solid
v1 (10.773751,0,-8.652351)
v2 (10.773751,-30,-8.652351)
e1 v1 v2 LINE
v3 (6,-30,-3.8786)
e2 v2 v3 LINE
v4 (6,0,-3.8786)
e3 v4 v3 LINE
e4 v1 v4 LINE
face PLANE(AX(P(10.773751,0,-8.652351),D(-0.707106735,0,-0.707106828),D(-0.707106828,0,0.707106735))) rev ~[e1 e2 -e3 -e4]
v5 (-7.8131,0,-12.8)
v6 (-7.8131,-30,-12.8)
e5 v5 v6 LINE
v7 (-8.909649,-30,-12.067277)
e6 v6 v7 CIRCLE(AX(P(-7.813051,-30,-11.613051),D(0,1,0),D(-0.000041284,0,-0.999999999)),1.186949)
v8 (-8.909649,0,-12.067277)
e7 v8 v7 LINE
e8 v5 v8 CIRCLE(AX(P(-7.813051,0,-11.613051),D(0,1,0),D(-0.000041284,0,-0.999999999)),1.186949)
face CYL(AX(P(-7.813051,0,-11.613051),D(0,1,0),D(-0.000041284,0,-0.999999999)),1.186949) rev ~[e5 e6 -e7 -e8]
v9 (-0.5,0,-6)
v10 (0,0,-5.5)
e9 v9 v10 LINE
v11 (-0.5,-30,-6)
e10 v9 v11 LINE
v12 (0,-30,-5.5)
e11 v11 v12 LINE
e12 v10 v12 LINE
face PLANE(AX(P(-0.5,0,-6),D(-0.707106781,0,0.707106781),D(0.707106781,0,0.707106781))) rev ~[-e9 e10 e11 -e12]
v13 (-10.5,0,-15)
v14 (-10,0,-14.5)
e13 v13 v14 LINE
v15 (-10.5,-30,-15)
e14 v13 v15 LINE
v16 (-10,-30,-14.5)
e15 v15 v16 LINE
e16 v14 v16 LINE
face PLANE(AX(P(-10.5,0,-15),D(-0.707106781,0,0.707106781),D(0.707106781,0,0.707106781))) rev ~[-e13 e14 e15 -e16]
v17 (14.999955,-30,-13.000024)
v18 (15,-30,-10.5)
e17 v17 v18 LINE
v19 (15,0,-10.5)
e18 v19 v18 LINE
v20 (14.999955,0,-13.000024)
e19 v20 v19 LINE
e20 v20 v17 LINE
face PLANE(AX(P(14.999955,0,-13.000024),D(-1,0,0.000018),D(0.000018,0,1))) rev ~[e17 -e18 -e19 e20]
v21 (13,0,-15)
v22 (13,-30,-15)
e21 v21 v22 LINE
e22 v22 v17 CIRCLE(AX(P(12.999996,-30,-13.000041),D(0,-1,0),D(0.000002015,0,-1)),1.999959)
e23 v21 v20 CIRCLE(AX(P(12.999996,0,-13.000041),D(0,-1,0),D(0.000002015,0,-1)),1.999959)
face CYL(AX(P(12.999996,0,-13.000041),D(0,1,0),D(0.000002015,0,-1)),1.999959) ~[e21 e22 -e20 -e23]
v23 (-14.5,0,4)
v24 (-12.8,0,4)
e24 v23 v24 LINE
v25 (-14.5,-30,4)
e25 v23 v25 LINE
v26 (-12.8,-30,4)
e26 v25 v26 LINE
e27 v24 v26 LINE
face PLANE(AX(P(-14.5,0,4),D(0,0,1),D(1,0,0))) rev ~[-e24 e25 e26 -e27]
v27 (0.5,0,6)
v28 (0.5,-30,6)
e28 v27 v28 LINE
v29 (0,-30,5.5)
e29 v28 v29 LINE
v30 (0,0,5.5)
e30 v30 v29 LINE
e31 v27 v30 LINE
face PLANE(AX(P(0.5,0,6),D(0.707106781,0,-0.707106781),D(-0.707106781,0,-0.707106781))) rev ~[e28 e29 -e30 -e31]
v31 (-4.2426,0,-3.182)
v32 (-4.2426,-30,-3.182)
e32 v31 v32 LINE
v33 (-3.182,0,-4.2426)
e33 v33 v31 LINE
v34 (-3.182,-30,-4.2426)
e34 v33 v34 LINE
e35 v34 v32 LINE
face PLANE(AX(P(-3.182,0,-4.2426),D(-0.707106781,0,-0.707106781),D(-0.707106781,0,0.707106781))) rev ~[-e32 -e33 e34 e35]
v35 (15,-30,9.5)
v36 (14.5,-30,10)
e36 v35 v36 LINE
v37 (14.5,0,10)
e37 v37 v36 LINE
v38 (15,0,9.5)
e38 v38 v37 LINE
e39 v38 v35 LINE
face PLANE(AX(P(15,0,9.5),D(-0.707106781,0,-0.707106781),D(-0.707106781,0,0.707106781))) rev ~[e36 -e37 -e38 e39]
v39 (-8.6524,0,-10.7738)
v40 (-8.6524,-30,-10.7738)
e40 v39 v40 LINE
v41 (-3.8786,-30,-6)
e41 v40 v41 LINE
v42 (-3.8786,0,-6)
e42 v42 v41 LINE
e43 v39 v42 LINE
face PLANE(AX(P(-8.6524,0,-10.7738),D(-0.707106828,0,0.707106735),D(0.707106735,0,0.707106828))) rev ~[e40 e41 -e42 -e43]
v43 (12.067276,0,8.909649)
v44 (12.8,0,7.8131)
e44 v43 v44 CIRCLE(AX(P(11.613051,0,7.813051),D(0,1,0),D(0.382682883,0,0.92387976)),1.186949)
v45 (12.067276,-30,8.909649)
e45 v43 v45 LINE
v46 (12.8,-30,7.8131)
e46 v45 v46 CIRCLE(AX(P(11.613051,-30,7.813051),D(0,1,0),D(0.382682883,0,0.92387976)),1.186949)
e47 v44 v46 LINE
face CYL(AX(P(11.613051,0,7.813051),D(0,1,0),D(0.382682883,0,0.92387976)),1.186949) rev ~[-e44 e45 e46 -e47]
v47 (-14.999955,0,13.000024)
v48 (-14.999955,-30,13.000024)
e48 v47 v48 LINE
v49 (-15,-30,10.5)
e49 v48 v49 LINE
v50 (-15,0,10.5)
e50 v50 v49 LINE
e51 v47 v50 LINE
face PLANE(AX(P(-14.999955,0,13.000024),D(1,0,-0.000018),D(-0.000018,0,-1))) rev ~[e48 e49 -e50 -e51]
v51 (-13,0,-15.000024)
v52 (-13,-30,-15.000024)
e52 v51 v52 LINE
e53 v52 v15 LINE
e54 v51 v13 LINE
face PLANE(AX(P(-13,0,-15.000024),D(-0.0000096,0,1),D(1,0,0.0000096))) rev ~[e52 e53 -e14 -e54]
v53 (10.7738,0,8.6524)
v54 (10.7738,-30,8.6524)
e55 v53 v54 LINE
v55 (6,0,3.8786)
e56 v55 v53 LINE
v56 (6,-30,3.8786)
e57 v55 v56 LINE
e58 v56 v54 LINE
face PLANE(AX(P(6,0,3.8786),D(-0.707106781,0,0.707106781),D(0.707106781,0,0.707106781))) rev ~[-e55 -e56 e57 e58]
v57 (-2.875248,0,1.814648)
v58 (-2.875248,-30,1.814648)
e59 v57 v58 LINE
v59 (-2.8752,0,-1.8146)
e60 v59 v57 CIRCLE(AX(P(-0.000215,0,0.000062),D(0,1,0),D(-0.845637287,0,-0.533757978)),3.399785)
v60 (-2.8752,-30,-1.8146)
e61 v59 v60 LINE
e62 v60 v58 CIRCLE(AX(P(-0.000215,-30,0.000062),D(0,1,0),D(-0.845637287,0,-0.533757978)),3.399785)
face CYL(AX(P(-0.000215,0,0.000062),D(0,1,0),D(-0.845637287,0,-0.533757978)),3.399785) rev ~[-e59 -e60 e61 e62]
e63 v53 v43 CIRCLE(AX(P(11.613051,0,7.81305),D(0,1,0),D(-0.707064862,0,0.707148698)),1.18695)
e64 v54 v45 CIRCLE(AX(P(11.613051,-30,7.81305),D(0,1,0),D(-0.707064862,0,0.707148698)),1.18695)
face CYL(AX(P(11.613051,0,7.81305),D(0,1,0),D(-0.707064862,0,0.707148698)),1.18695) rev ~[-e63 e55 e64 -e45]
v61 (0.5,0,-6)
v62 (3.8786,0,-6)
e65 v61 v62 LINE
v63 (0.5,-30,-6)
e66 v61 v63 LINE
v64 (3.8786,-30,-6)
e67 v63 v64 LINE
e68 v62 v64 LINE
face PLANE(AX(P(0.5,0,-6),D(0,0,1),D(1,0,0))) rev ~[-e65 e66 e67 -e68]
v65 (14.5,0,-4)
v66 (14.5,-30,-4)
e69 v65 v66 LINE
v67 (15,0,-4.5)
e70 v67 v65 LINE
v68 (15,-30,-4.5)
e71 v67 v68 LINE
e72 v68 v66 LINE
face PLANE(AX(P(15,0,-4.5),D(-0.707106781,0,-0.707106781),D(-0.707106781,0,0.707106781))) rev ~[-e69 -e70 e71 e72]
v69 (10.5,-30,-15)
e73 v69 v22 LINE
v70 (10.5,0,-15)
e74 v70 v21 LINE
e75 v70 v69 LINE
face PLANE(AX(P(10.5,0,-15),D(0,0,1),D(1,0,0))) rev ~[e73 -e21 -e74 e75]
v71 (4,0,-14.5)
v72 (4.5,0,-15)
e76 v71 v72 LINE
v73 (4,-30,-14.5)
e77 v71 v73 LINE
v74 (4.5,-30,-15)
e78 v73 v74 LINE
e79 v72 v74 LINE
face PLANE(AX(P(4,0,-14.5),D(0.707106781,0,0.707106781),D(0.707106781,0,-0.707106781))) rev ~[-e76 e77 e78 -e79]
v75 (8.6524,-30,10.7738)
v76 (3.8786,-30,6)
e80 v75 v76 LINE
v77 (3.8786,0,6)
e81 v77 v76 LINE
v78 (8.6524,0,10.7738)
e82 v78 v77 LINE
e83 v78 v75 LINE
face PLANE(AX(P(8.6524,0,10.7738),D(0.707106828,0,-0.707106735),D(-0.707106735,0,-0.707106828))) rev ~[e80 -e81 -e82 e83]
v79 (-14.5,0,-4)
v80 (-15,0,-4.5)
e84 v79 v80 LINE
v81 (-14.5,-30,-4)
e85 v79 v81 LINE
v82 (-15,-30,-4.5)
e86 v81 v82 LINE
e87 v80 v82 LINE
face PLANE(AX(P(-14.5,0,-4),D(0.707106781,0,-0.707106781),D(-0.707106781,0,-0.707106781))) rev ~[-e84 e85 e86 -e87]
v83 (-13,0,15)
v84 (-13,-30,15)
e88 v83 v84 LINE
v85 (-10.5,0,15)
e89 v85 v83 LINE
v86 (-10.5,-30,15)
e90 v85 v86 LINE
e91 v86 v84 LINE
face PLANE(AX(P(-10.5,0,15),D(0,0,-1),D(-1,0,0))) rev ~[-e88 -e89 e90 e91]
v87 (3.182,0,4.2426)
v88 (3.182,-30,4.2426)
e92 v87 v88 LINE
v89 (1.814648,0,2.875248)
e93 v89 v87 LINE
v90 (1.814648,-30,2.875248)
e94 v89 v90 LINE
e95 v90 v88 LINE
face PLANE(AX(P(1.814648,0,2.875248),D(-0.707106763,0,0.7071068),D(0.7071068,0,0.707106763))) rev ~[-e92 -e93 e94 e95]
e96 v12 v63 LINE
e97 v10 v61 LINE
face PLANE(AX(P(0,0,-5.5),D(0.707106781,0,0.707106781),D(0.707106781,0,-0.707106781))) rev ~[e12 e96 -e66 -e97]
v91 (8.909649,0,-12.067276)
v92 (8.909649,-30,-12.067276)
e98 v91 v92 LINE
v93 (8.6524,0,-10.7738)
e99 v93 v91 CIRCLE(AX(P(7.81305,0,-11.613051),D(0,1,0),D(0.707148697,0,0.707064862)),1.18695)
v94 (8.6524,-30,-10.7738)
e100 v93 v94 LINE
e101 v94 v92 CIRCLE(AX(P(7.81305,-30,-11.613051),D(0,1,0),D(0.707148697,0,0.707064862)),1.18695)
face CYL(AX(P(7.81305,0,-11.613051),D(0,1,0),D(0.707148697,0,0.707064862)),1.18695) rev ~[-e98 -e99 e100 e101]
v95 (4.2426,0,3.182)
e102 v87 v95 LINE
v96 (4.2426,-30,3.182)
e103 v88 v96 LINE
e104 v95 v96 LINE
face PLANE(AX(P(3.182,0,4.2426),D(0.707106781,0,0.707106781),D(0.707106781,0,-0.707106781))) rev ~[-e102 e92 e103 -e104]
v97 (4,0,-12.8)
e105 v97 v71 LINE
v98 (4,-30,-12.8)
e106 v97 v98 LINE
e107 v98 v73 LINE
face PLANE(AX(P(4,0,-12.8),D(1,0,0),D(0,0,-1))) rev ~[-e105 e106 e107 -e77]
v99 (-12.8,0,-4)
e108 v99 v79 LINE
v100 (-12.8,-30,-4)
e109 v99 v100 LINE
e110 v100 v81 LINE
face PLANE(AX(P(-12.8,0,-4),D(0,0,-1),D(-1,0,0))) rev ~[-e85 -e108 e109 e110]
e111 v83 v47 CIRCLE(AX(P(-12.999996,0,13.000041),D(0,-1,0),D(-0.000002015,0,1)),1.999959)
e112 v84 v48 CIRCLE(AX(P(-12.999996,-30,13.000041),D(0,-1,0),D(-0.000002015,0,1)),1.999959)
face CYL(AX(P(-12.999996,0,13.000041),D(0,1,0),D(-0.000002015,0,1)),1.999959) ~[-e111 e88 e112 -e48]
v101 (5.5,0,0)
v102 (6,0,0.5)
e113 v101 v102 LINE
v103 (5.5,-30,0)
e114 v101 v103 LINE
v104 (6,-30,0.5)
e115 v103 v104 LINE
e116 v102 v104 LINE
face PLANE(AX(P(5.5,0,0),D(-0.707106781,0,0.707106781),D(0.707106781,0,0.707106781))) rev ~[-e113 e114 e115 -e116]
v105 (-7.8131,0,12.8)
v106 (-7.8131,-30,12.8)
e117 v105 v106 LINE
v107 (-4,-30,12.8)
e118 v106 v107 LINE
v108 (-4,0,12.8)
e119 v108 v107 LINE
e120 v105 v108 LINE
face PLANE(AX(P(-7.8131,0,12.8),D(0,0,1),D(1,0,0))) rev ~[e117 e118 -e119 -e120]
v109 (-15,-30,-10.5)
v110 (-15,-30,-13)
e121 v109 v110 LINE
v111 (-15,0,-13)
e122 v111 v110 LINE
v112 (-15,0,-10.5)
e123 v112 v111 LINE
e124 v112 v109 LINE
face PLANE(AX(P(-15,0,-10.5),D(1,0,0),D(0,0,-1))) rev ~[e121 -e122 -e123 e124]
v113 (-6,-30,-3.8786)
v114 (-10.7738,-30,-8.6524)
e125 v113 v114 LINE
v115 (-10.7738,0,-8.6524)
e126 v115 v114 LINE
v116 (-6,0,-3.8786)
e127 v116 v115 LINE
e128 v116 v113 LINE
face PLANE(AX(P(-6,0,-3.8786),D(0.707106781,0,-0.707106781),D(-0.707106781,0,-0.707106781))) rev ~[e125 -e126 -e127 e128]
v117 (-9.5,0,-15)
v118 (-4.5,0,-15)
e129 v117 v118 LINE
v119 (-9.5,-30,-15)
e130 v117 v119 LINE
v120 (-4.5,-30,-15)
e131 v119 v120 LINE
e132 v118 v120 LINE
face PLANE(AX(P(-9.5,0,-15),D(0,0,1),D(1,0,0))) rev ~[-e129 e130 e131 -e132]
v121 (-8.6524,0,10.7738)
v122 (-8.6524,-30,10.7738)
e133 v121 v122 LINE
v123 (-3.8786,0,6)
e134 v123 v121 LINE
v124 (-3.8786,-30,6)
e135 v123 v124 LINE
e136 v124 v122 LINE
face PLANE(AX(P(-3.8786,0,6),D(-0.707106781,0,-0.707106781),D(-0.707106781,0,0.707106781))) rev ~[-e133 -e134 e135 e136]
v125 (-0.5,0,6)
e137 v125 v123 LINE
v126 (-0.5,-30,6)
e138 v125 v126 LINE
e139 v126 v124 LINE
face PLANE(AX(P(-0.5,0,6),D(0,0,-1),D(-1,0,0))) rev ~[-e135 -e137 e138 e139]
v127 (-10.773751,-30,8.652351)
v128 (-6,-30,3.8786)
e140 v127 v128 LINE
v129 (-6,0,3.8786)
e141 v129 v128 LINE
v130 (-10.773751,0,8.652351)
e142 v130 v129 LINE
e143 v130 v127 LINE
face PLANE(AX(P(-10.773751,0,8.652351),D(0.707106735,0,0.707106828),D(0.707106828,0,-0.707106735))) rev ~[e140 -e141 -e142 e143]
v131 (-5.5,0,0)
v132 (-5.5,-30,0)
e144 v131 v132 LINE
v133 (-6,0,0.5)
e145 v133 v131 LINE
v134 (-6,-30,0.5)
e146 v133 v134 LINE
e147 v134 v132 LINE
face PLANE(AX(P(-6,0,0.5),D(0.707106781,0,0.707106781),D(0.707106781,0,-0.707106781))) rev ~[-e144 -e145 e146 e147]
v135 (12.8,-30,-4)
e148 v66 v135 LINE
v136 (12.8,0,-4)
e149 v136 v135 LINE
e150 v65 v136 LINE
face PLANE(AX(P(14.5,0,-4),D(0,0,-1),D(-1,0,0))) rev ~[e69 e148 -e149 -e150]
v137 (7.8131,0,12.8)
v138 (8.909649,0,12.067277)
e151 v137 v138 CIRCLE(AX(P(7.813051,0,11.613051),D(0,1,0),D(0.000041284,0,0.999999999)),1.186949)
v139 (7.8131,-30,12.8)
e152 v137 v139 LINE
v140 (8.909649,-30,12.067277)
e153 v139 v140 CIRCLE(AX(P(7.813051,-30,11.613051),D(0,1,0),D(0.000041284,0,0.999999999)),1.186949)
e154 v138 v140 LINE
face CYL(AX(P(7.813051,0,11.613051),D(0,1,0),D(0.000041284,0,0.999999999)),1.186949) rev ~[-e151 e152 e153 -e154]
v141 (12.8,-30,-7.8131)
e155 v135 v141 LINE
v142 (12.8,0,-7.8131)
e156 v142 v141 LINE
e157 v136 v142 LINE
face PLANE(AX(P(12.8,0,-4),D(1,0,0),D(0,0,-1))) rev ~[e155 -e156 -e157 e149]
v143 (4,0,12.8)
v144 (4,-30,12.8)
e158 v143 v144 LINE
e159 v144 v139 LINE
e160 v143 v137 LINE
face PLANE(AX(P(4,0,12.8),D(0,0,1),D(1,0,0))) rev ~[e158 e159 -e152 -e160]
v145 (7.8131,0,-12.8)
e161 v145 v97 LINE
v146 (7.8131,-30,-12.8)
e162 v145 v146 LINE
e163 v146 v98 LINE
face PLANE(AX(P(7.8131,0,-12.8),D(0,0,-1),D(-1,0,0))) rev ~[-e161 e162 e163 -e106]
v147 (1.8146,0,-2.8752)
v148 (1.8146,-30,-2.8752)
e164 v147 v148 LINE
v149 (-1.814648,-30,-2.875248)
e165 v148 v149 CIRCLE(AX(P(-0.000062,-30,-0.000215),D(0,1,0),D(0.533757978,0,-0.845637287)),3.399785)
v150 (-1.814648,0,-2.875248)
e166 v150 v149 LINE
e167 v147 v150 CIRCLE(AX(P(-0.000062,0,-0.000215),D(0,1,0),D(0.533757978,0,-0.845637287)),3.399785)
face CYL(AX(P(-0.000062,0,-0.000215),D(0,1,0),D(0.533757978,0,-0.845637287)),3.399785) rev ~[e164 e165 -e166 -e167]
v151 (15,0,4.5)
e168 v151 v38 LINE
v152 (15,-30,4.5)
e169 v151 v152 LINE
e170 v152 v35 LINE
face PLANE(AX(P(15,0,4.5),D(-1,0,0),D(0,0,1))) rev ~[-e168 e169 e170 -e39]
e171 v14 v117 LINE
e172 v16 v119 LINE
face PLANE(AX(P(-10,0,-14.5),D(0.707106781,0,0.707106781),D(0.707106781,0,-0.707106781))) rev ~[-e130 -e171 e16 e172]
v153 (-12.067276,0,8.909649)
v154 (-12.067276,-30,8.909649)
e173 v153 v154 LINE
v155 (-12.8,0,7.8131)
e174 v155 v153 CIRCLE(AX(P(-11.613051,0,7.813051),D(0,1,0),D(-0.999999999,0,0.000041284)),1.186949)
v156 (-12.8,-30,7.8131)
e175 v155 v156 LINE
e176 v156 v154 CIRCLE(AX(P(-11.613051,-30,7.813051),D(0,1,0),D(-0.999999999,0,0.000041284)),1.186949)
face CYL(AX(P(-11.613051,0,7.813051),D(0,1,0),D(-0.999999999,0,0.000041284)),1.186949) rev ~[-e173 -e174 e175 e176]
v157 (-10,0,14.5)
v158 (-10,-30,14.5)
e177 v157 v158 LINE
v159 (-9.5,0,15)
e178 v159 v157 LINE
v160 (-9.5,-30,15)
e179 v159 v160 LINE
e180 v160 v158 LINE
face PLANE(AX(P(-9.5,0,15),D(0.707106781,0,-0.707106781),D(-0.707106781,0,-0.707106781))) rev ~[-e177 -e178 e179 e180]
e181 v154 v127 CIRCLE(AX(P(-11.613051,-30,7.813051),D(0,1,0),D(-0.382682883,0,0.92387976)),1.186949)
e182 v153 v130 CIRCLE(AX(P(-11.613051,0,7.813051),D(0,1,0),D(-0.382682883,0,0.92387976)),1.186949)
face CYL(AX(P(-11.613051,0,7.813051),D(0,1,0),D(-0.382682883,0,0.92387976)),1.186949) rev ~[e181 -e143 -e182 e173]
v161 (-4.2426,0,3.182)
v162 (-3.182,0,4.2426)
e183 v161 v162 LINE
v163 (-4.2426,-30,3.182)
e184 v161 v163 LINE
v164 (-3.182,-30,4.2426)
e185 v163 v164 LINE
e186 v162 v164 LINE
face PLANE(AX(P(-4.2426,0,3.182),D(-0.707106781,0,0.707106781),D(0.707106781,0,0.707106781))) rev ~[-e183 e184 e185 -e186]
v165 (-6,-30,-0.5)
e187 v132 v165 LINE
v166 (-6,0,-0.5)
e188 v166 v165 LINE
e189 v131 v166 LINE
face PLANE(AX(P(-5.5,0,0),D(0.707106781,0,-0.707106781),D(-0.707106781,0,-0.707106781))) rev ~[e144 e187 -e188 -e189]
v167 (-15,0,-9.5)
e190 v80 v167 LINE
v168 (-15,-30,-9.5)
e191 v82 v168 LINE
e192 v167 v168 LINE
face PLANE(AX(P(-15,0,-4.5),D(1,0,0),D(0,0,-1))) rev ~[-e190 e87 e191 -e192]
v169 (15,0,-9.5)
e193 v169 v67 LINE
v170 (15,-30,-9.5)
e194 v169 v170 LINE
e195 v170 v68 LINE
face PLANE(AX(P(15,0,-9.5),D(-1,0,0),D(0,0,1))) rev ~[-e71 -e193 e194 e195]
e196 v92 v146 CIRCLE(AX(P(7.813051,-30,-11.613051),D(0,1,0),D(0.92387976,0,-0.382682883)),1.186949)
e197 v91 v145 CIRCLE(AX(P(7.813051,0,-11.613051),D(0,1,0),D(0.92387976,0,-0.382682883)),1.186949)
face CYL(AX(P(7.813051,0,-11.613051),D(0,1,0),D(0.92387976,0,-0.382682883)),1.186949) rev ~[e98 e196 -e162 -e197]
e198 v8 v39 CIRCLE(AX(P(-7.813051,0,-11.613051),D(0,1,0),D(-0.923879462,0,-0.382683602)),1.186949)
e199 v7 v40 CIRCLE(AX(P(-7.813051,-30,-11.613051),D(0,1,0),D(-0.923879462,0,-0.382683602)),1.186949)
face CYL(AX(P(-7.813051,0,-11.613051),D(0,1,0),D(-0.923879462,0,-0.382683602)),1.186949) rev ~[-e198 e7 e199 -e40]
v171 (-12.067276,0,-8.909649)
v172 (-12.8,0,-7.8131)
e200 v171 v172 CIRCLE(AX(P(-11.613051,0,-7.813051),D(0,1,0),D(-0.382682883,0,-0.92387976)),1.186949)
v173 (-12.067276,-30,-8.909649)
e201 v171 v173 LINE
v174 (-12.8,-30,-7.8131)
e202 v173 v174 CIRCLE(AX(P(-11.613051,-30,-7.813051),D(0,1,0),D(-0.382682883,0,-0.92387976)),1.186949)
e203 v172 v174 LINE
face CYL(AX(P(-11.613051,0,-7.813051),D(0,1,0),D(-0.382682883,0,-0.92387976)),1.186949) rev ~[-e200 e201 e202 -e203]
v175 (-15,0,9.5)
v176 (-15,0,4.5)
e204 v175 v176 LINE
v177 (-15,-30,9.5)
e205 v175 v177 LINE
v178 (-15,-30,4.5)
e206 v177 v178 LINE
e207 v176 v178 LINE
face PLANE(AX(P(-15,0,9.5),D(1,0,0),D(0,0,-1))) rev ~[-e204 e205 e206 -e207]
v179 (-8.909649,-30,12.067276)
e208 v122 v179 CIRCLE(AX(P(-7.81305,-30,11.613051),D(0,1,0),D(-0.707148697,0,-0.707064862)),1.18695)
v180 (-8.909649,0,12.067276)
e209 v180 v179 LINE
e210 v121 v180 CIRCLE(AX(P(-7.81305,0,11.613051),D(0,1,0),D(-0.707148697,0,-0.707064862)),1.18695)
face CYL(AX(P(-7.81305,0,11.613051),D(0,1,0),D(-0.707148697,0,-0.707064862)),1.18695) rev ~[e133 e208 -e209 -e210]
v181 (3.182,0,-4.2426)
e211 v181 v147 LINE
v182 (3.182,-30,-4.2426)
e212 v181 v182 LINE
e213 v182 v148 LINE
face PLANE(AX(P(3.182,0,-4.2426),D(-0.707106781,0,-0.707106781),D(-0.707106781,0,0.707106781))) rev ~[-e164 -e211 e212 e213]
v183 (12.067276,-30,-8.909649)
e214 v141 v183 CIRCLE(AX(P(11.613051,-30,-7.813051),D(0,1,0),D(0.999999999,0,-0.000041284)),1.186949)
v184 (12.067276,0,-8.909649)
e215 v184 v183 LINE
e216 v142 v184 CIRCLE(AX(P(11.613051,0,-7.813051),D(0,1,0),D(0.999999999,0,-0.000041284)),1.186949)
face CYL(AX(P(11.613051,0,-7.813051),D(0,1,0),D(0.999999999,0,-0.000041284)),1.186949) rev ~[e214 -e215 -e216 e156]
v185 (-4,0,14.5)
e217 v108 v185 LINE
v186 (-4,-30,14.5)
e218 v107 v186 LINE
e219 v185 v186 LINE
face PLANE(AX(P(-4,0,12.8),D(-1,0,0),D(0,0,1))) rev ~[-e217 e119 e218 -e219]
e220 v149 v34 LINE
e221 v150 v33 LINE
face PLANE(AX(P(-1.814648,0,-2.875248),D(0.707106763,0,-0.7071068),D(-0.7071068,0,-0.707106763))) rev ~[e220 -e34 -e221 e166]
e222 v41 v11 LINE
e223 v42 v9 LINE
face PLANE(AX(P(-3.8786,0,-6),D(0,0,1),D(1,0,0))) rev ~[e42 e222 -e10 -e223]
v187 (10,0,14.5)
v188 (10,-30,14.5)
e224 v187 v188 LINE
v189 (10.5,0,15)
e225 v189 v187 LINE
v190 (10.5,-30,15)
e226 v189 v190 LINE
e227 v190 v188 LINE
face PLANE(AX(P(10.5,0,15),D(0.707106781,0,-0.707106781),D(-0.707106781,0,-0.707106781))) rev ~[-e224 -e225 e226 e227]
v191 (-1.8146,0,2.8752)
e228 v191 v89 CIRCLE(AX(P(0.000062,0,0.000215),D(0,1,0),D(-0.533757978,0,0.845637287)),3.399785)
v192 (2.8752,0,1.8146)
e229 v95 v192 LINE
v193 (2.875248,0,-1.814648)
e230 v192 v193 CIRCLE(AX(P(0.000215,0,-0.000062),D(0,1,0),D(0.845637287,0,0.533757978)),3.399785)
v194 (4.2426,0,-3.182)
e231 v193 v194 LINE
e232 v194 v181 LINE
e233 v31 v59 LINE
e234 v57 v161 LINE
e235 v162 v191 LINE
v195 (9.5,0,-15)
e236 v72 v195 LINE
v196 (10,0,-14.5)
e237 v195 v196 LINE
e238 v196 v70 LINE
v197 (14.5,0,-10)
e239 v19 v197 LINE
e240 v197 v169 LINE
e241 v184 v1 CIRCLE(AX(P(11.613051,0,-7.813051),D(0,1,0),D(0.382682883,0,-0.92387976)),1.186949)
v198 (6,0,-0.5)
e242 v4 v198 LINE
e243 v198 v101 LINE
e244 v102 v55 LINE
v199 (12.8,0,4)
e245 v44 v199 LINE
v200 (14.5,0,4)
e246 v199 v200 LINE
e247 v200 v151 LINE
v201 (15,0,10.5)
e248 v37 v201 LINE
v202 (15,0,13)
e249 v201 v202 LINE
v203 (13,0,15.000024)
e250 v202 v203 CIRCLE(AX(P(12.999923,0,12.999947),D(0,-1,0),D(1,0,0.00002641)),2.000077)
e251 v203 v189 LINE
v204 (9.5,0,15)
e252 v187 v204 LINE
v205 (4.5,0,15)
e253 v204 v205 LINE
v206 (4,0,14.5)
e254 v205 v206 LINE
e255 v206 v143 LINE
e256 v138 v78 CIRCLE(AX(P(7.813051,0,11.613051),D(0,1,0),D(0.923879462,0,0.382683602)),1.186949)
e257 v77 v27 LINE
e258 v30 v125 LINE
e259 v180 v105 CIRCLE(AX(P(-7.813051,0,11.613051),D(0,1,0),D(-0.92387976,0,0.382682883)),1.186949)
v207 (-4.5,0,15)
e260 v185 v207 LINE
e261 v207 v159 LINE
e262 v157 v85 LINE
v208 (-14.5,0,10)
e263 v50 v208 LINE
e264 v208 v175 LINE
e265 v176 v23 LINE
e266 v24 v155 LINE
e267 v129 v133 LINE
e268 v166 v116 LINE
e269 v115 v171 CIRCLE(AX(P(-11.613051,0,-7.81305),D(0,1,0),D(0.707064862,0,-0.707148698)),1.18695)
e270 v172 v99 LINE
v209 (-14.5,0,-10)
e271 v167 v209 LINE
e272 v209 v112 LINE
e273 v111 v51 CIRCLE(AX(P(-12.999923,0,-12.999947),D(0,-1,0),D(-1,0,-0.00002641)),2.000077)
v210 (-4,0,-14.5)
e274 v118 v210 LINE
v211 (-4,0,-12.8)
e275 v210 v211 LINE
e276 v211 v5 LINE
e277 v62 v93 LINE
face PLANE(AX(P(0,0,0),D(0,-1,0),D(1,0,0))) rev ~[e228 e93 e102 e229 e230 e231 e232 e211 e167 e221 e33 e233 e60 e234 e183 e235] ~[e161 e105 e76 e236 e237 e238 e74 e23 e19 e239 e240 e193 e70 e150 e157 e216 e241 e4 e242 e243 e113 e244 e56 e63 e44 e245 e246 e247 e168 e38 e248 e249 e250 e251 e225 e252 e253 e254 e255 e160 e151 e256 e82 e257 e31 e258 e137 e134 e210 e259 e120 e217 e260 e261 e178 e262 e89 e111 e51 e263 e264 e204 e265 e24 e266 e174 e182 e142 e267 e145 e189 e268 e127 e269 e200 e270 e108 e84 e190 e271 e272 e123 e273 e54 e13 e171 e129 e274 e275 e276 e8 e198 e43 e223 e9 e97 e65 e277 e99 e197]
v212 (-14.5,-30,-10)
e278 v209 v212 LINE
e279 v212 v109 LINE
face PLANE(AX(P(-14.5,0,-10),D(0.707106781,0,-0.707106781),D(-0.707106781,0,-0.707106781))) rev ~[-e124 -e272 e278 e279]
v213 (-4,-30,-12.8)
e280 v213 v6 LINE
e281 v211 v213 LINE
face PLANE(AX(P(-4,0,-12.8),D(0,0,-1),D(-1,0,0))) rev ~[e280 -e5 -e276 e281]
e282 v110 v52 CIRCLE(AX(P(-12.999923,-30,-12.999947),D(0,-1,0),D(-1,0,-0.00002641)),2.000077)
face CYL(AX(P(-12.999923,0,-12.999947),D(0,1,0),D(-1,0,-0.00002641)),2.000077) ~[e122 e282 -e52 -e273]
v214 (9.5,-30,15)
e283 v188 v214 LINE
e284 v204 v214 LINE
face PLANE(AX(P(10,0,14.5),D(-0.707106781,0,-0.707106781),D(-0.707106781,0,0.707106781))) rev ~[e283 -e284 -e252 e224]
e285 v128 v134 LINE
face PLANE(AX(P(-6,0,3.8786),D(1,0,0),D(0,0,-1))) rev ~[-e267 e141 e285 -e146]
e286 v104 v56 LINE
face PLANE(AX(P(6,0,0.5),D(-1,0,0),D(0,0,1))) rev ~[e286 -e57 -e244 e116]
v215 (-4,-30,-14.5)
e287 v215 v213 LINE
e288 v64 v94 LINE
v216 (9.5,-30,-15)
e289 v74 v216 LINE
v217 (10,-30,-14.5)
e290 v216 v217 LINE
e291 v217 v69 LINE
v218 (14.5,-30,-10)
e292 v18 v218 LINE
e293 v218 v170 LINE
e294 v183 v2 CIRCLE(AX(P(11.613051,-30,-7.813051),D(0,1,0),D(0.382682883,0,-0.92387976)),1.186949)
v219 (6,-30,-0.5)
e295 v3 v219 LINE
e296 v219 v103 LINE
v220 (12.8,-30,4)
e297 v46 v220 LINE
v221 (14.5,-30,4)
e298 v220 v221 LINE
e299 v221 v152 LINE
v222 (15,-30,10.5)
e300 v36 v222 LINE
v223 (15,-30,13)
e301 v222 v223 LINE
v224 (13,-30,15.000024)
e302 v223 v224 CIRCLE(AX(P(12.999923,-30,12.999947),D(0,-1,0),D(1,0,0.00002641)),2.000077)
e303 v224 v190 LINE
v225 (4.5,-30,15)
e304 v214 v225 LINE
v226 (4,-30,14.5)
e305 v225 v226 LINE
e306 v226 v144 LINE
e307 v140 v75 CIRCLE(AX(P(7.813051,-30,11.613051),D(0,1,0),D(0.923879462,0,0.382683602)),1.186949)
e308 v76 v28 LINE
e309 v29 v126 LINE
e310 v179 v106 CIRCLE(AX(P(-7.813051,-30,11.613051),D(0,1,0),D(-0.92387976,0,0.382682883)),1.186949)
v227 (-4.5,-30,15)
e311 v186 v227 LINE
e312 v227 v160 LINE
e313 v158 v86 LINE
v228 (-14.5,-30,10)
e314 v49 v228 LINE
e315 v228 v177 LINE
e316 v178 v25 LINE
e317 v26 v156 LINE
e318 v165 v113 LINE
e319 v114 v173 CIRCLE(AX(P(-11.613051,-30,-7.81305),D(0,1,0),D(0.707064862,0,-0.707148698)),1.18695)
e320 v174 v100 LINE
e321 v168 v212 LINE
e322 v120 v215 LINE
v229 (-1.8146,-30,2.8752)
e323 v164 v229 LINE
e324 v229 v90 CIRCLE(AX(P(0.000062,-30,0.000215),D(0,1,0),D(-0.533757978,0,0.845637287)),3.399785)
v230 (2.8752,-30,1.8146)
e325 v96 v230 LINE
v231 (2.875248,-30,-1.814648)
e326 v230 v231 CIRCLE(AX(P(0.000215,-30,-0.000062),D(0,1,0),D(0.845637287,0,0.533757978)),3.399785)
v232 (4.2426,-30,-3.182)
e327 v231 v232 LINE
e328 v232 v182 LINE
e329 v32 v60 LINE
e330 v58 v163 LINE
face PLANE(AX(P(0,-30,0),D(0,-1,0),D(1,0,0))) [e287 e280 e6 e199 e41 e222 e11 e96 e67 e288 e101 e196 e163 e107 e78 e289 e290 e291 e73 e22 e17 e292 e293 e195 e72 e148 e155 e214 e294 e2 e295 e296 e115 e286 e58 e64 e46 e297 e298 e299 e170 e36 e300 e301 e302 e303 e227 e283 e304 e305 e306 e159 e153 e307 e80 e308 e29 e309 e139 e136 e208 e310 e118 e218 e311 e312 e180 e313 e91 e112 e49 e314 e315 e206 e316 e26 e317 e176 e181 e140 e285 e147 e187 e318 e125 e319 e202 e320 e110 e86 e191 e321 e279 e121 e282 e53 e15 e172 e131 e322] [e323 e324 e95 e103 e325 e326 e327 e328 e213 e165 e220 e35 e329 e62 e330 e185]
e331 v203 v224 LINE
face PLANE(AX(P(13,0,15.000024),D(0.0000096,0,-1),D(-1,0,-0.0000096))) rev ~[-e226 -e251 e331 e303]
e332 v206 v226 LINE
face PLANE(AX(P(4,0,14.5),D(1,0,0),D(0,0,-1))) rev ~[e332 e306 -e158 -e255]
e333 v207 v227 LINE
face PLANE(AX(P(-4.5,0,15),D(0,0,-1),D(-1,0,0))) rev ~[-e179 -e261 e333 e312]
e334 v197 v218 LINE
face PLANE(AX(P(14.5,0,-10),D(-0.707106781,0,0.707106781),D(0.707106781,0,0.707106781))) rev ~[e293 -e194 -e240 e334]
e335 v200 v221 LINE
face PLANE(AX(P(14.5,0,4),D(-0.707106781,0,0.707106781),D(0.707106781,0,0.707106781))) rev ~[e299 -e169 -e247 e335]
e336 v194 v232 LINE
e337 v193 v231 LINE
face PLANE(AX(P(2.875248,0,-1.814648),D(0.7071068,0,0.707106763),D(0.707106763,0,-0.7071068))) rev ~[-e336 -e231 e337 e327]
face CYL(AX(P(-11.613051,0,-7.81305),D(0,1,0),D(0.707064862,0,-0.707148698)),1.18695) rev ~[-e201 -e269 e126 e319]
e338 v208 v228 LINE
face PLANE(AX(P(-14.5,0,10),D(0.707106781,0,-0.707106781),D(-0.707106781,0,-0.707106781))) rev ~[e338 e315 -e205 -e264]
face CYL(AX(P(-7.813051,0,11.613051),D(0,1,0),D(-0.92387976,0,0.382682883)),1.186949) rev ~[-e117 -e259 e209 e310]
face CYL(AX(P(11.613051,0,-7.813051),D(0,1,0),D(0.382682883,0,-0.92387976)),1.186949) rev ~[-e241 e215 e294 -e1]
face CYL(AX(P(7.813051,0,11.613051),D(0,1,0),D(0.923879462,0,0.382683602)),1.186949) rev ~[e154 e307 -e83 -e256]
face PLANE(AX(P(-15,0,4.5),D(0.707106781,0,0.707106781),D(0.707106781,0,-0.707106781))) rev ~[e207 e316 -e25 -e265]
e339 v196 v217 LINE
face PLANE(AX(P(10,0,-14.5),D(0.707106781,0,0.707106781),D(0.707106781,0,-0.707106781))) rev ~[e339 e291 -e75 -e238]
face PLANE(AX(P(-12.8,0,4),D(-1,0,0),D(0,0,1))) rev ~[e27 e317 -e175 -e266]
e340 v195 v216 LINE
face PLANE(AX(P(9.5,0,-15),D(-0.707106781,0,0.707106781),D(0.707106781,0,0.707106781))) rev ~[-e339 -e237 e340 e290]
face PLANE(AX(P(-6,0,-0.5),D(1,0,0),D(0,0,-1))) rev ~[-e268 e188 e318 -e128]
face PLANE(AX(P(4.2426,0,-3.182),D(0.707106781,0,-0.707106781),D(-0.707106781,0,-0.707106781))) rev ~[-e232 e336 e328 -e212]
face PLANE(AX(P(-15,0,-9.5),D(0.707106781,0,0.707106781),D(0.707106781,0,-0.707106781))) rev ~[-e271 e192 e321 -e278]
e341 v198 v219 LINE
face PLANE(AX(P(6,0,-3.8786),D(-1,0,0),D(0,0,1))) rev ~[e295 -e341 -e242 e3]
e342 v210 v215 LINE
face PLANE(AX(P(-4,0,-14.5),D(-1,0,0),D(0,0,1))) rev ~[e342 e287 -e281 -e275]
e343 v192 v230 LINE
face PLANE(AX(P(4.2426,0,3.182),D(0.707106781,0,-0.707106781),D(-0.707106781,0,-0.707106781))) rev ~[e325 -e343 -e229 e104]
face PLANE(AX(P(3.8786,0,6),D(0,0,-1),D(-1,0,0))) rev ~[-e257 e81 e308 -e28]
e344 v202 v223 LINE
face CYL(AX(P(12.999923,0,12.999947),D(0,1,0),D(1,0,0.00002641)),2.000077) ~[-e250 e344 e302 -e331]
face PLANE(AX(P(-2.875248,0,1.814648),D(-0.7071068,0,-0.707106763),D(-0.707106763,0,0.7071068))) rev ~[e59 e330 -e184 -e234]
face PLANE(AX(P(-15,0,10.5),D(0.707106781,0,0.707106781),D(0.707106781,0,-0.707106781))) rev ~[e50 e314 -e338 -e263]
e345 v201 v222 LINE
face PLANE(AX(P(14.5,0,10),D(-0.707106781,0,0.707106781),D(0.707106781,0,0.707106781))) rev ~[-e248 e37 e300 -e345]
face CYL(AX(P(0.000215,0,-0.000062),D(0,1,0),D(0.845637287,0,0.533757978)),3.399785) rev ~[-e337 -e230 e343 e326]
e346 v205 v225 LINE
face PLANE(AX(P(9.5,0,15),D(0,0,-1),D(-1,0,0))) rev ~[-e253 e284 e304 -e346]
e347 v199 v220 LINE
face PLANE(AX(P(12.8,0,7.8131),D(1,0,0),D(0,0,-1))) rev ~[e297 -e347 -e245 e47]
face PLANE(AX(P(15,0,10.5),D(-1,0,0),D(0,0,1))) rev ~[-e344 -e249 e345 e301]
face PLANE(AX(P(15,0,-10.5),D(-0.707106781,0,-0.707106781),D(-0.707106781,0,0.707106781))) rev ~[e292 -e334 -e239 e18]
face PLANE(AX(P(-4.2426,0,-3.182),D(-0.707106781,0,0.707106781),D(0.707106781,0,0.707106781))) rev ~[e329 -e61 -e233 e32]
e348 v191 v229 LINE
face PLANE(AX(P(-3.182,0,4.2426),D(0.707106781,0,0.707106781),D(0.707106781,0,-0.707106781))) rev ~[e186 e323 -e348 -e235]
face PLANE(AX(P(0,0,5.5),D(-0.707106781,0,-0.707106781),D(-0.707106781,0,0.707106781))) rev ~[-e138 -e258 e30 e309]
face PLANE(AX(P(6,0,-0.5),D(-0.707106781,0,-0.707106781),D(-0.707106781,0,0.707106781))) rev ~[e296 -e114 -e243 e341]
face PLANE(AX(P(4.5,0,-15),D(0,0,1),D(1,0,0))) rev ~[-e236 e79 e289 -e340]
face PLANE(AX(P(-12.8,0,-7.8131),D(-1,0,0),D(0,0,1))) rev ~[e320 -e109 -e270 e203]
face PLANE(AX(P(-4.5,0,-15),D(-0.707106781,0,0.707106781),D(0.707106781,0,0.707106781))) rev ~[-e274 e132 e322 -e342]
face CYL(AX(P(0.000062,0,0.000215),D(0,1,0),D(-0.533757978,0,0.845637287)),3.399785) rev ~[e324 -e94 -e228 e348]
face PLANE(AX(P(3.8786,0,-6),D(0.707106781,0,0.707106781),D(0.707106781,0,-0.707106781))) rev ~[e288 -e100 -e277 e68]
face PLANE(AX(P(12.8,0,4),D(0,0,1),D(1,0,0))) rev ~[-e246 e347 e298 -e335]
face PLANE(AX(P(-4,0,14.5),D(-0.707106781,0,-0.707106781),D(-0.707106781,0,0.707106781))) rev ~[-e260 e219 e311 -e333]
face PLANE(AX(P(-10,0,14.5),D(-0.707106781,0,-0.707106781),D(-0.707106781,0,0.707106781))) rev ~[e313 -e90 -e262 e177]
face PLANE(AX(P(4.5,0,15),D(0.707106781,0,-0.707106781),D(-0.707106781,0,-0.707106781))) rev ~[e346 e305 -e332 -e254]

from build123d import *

# Parameters (mm, degrees)
F1_DEPTH = 30


# Not quite as in the source:
# - ends of sketch curves that miss each other by under 0.0002 mm in the source are joined


with BuildPart() as f1:
    # F0 (on Front) → F1 (new body)
    with BuildSketch(Plane.XZ):
        with BuildLine():
            ThreePointArc((-12.0672760652, 8.9096491574), (-11.3814883912, 8.9771930389), (-10.7737513132, 8.6523506868))
            Line((-10.7737513132, 8.6523506868), (-6, 3.8786))
            Line((-6, 3.8786), (-6, 0.5))
            Line((-6, 0.5), (-5.5, 0))
            Line((-5.5, 0), (-6, -0.5))
            Line((-6, -0.5), (-6, -3.8786))
            Line((-6, -3.8786), (-10.7738, -8.6524))
            ThreePointArc((-10.7738, -8.6524), (-11.3814883912, -8.9771930389), (-12.0672760652, -8.9096491574))
            ThreePointArc((-12.0672760652, -8.9096491574), (-12.5999492171, -8.4725051968), (-12.799999999, -7.8131))
            Line((-12.799999999, -7.8131), (-12.8, -4))
            Line((-12.8, -4), (-14.5, -4))
            Line((-14.5, -4), (-15, -4.5))
            Line((-15, -4.5), (-15, -9.5))
            Line((-15, -9.5), (-14.5, -10))
            Line((-14.5, -10), (-15, -10.5))
            Line((-15, -10.5), (-15, -13))
            ThreePointArc((-15, -13), (-14.4141844722, -14.4142216524), (-13, -15.0000239995))
            Line((-13, -15.0000239995), (-10.5, -15))
            Line((-10.5, -15), (-10, -14.5))
            Line((-10, -14.5), (-9.5, -15))
            Line((-9.5, -15), (-4.5, -15))
            Line((-4.5, -15), (-4, -14.5))
            Line((-4, -14.5), (-4, -12.8))
            Line((-4, -12.8), (-7.8131, -12.8))
            ThreePointArc((-7.8131, -12.8), (-8.4725048128, -12.5999494737), (-8.9096488038, -12.0672769187))
            ThreePointArc((-8.9096488038, -12.0672769187), (-8.977199798, -11.3815223738), (-8.6523996854, -10.7738003146))
            Line((-8.6523996854, -10.7738003146), (-3.8786, -6))
            Line((-3.8786, -6), (-0.5, -6))
            Line((-0.5, -6), (0, -5.5))
            Line((0, -5.5), (0.5, -6))
            Line((0.5, -6), (3.8786, -6))
            Line((3.8786, -6), (8.6524, -10.7738))
            ThreePointArc((8.6524, -10.7738), (8.977199798, -11.3815223738), (8.9096491574, -12.0672760652))
            ThreePointArc((8.9096491574, -12.0672760652), (8.4725048128, -12.5999494737), (7.8131, -12.799999999))
            Line((7.8131, -12.799999999), (4, -12.8))
            Line((4, -12.8), (4, -14.5))
            Line((4, -14.5), (4.5, -15))
            Line((4.5, -15), (9.5, -15))
            Line((9.5, -15), (10, -14.5))
            Line((10, -14.5), (10.5, -15))
            Line((10.5, -15), (13, -15))
            ThreePointArc((13, -15), (14.4141844722, -14.4142216524), (14.999955, -13.000024))
            Line((14.999955, -13.000024), (15, -10.5))
            Line((15, -10.5), (14.5, -10))
            Line((14.5, -10), (15, -9.5))
            Line((15, -9.5), (15, -4.5))
            Line((15, -4.5), (14.5, -4))
            Line((14.5, -4), (12.8, -4))
            Line((12.8, -4), (12.8, -7.8131))
            ThreePointArc((12.8, -7.8131), (12.5999492171, -8.4725051968), (12.0672760652, -8.9096491574))
            ThreePointArc((12.0672760652, -8.9096491574), (11.3814883912, -8.9771930389), (10.7737513132, -8.6523506868))
            Line((10.7737513132, -8.6523506868), (6, -3.8786))
            Line((6, -3.8786), (6, -0.5))
            Line((6, -0.5), (5.5, 0))
            Line((5.5, 0), (6, 0.5))
            Line((6, 0.5), (6, 3.8786))
            Line((6, 3.8786), (10.7738, 8.6524))
            ThreePointArc((10.7738, 8.6524), (11.3814883912, 8.9771930389), (12.0672760652, 8.9096491574))
            ThreePointArc((12.0672760652, 8.9096491574), (12.5999492171, 8.4725051968), (12.799999999, 7.8131))
            Line((12.799999999, 7.8131), (12.8, 4))
            Line((12.8, 4), (14.5, 4))
            Line((14.5, 4), (15, 4.5))
            Line((15, 4.5), (15, 9.5))
            Line((15, 9.5), (14.5, 10))
            Line((14.5, 10), (15, 10.5))
            Line((15, 10.5), (15, 13))
            ThreePointArc((15, 13), (14.4141844722, 14.4142216524), (13, 15.0000239995))
            Line((13, 15.0000239995), (10.5, 15))
            Line((10.5, 15), (10, 14.5))
            Line((10, 14.5), (9.5, 15))
            Line((9.5, 15), (4.5, 15))
            Line((4.5, 15), (4, 14.5))
            Line((4, 14.5), (4, 12.8))
            Line((4, 12.8), (7.8131, 12.8))
            ThreePointArc((7.8131, 12.8), (8.4725048128, 12.5999494737), (8.9096488038, 12.0672769187))
            ThreePointArc((8.9096488038, 12.0672769187), (8.977199798, 11.3815223738), (8.6523996854, 10.7738003146))
            Line((8.6523996854, 10.7738003146), (3.8786, 6))
            Line((3.8786, 6), (0.5, 6))
            Line((0.5, 6), (0, 5.5))
            Line((0, 5.5), (-0.5, 6))
            Line((-0.5, 6), (-3.8786, 6))
            Line((-3.8786, 6), (-8.6524, 10.7738))
            ThreePointArc((-8.6524, 10.7738), (-8.977199798, 11.3815223738), (-8.9096491574, 12.0672760652))
            ThreePointArc((-8.9096491574, 12.0672760652), (-8.4725048128, 12.5999494737), (-7.8131, 12.799999999))
            Line((-7.8131, 12.799999999), (-4, 12.8))
            Line((-4, 12.8), (-4, 14.5))
            Line((-4, 14.5), (-4.5, 15))
            Line((-4.5, 15), (-9.5, 15))
            Line((-9.5, 15), (-10, 14.5))
            Line((-10, 14.5), (-10.5, 15))
            Line((-10.5, 15), (-13, 15))
            ThreePointArc((-13, 15), (-14.4141844722, 14.4142216524), (-14.999955, 13.000024))
            Line((-14.999955, 13.000024), (-15, 10.5))
            Line((-15, 10.5), (-14.5, 10))
            Line((-14.5, 10), (-15, 9.5))
            Line((-15, 9.5), (-15, 4.5))
            Line((-15, 4.5), (-14.5, 4))
            Line((-14.5, 4), (-12.8, 4))
            Line((-12.8, 4), (-12.8, 7.8131))
            ThreePointArc((-12.8, 7.8131), (-12.5999492171, 8.4725051968), (-12.0672760652, 8.9096491574))
        make_face()
        with BuildLine():
            Line((-4.2426, -3.182), (-2.8752, -1.8146))
            ThreePointArc((-2.8752, -1.8146), (-3.4, 0), (-2.8752481958, 1.8146481236))
            Line((-2.8752481958, 1.8146481236), (-4.2426, 3.182))
            Line((-4.2426, 3.182), (-3.182, 4.2426))
            Line((-3.182, 4.2426), (-1.8146, 2.8752))
            ThreePointArc((-1.8146, 2.8752), (0, 3.4), (1.8146481236, 2.8752481958))
            Line((1.8146481236, 2.8752481958), (3.182, 4.2426))
            Line((3.182, 4.2426), (4.2426, 3.182))
            Line((4.2426, 3.182), (2.8752, 1.8146))
            ThreePointArc((2.8752, 1.8146), (3.4, 0), (2.8752481958, -1.8146481236))
            Line((2.8752481958, -1.8146481236), (4.2426, -3.182))
            Line((4.2426, -3.182), (3.182, -4.2426))
            Line((3.182, -4.2426), (1.8146, -2.8752))
            ThreePointArc((1.8146, -2.8752), (0, -3.4), (-1.8146481236, -2.8752481958))
            Line((-1.8146481236, -2.8752481958), (-3.182, -4.2426))
            Line((-3.182, -4.2426), (-4.2426, -3.182))
        make_face(mode=Mode.SUBTRACT)
    extrude(amount=F1_DEPTH)


solid = f1.part
